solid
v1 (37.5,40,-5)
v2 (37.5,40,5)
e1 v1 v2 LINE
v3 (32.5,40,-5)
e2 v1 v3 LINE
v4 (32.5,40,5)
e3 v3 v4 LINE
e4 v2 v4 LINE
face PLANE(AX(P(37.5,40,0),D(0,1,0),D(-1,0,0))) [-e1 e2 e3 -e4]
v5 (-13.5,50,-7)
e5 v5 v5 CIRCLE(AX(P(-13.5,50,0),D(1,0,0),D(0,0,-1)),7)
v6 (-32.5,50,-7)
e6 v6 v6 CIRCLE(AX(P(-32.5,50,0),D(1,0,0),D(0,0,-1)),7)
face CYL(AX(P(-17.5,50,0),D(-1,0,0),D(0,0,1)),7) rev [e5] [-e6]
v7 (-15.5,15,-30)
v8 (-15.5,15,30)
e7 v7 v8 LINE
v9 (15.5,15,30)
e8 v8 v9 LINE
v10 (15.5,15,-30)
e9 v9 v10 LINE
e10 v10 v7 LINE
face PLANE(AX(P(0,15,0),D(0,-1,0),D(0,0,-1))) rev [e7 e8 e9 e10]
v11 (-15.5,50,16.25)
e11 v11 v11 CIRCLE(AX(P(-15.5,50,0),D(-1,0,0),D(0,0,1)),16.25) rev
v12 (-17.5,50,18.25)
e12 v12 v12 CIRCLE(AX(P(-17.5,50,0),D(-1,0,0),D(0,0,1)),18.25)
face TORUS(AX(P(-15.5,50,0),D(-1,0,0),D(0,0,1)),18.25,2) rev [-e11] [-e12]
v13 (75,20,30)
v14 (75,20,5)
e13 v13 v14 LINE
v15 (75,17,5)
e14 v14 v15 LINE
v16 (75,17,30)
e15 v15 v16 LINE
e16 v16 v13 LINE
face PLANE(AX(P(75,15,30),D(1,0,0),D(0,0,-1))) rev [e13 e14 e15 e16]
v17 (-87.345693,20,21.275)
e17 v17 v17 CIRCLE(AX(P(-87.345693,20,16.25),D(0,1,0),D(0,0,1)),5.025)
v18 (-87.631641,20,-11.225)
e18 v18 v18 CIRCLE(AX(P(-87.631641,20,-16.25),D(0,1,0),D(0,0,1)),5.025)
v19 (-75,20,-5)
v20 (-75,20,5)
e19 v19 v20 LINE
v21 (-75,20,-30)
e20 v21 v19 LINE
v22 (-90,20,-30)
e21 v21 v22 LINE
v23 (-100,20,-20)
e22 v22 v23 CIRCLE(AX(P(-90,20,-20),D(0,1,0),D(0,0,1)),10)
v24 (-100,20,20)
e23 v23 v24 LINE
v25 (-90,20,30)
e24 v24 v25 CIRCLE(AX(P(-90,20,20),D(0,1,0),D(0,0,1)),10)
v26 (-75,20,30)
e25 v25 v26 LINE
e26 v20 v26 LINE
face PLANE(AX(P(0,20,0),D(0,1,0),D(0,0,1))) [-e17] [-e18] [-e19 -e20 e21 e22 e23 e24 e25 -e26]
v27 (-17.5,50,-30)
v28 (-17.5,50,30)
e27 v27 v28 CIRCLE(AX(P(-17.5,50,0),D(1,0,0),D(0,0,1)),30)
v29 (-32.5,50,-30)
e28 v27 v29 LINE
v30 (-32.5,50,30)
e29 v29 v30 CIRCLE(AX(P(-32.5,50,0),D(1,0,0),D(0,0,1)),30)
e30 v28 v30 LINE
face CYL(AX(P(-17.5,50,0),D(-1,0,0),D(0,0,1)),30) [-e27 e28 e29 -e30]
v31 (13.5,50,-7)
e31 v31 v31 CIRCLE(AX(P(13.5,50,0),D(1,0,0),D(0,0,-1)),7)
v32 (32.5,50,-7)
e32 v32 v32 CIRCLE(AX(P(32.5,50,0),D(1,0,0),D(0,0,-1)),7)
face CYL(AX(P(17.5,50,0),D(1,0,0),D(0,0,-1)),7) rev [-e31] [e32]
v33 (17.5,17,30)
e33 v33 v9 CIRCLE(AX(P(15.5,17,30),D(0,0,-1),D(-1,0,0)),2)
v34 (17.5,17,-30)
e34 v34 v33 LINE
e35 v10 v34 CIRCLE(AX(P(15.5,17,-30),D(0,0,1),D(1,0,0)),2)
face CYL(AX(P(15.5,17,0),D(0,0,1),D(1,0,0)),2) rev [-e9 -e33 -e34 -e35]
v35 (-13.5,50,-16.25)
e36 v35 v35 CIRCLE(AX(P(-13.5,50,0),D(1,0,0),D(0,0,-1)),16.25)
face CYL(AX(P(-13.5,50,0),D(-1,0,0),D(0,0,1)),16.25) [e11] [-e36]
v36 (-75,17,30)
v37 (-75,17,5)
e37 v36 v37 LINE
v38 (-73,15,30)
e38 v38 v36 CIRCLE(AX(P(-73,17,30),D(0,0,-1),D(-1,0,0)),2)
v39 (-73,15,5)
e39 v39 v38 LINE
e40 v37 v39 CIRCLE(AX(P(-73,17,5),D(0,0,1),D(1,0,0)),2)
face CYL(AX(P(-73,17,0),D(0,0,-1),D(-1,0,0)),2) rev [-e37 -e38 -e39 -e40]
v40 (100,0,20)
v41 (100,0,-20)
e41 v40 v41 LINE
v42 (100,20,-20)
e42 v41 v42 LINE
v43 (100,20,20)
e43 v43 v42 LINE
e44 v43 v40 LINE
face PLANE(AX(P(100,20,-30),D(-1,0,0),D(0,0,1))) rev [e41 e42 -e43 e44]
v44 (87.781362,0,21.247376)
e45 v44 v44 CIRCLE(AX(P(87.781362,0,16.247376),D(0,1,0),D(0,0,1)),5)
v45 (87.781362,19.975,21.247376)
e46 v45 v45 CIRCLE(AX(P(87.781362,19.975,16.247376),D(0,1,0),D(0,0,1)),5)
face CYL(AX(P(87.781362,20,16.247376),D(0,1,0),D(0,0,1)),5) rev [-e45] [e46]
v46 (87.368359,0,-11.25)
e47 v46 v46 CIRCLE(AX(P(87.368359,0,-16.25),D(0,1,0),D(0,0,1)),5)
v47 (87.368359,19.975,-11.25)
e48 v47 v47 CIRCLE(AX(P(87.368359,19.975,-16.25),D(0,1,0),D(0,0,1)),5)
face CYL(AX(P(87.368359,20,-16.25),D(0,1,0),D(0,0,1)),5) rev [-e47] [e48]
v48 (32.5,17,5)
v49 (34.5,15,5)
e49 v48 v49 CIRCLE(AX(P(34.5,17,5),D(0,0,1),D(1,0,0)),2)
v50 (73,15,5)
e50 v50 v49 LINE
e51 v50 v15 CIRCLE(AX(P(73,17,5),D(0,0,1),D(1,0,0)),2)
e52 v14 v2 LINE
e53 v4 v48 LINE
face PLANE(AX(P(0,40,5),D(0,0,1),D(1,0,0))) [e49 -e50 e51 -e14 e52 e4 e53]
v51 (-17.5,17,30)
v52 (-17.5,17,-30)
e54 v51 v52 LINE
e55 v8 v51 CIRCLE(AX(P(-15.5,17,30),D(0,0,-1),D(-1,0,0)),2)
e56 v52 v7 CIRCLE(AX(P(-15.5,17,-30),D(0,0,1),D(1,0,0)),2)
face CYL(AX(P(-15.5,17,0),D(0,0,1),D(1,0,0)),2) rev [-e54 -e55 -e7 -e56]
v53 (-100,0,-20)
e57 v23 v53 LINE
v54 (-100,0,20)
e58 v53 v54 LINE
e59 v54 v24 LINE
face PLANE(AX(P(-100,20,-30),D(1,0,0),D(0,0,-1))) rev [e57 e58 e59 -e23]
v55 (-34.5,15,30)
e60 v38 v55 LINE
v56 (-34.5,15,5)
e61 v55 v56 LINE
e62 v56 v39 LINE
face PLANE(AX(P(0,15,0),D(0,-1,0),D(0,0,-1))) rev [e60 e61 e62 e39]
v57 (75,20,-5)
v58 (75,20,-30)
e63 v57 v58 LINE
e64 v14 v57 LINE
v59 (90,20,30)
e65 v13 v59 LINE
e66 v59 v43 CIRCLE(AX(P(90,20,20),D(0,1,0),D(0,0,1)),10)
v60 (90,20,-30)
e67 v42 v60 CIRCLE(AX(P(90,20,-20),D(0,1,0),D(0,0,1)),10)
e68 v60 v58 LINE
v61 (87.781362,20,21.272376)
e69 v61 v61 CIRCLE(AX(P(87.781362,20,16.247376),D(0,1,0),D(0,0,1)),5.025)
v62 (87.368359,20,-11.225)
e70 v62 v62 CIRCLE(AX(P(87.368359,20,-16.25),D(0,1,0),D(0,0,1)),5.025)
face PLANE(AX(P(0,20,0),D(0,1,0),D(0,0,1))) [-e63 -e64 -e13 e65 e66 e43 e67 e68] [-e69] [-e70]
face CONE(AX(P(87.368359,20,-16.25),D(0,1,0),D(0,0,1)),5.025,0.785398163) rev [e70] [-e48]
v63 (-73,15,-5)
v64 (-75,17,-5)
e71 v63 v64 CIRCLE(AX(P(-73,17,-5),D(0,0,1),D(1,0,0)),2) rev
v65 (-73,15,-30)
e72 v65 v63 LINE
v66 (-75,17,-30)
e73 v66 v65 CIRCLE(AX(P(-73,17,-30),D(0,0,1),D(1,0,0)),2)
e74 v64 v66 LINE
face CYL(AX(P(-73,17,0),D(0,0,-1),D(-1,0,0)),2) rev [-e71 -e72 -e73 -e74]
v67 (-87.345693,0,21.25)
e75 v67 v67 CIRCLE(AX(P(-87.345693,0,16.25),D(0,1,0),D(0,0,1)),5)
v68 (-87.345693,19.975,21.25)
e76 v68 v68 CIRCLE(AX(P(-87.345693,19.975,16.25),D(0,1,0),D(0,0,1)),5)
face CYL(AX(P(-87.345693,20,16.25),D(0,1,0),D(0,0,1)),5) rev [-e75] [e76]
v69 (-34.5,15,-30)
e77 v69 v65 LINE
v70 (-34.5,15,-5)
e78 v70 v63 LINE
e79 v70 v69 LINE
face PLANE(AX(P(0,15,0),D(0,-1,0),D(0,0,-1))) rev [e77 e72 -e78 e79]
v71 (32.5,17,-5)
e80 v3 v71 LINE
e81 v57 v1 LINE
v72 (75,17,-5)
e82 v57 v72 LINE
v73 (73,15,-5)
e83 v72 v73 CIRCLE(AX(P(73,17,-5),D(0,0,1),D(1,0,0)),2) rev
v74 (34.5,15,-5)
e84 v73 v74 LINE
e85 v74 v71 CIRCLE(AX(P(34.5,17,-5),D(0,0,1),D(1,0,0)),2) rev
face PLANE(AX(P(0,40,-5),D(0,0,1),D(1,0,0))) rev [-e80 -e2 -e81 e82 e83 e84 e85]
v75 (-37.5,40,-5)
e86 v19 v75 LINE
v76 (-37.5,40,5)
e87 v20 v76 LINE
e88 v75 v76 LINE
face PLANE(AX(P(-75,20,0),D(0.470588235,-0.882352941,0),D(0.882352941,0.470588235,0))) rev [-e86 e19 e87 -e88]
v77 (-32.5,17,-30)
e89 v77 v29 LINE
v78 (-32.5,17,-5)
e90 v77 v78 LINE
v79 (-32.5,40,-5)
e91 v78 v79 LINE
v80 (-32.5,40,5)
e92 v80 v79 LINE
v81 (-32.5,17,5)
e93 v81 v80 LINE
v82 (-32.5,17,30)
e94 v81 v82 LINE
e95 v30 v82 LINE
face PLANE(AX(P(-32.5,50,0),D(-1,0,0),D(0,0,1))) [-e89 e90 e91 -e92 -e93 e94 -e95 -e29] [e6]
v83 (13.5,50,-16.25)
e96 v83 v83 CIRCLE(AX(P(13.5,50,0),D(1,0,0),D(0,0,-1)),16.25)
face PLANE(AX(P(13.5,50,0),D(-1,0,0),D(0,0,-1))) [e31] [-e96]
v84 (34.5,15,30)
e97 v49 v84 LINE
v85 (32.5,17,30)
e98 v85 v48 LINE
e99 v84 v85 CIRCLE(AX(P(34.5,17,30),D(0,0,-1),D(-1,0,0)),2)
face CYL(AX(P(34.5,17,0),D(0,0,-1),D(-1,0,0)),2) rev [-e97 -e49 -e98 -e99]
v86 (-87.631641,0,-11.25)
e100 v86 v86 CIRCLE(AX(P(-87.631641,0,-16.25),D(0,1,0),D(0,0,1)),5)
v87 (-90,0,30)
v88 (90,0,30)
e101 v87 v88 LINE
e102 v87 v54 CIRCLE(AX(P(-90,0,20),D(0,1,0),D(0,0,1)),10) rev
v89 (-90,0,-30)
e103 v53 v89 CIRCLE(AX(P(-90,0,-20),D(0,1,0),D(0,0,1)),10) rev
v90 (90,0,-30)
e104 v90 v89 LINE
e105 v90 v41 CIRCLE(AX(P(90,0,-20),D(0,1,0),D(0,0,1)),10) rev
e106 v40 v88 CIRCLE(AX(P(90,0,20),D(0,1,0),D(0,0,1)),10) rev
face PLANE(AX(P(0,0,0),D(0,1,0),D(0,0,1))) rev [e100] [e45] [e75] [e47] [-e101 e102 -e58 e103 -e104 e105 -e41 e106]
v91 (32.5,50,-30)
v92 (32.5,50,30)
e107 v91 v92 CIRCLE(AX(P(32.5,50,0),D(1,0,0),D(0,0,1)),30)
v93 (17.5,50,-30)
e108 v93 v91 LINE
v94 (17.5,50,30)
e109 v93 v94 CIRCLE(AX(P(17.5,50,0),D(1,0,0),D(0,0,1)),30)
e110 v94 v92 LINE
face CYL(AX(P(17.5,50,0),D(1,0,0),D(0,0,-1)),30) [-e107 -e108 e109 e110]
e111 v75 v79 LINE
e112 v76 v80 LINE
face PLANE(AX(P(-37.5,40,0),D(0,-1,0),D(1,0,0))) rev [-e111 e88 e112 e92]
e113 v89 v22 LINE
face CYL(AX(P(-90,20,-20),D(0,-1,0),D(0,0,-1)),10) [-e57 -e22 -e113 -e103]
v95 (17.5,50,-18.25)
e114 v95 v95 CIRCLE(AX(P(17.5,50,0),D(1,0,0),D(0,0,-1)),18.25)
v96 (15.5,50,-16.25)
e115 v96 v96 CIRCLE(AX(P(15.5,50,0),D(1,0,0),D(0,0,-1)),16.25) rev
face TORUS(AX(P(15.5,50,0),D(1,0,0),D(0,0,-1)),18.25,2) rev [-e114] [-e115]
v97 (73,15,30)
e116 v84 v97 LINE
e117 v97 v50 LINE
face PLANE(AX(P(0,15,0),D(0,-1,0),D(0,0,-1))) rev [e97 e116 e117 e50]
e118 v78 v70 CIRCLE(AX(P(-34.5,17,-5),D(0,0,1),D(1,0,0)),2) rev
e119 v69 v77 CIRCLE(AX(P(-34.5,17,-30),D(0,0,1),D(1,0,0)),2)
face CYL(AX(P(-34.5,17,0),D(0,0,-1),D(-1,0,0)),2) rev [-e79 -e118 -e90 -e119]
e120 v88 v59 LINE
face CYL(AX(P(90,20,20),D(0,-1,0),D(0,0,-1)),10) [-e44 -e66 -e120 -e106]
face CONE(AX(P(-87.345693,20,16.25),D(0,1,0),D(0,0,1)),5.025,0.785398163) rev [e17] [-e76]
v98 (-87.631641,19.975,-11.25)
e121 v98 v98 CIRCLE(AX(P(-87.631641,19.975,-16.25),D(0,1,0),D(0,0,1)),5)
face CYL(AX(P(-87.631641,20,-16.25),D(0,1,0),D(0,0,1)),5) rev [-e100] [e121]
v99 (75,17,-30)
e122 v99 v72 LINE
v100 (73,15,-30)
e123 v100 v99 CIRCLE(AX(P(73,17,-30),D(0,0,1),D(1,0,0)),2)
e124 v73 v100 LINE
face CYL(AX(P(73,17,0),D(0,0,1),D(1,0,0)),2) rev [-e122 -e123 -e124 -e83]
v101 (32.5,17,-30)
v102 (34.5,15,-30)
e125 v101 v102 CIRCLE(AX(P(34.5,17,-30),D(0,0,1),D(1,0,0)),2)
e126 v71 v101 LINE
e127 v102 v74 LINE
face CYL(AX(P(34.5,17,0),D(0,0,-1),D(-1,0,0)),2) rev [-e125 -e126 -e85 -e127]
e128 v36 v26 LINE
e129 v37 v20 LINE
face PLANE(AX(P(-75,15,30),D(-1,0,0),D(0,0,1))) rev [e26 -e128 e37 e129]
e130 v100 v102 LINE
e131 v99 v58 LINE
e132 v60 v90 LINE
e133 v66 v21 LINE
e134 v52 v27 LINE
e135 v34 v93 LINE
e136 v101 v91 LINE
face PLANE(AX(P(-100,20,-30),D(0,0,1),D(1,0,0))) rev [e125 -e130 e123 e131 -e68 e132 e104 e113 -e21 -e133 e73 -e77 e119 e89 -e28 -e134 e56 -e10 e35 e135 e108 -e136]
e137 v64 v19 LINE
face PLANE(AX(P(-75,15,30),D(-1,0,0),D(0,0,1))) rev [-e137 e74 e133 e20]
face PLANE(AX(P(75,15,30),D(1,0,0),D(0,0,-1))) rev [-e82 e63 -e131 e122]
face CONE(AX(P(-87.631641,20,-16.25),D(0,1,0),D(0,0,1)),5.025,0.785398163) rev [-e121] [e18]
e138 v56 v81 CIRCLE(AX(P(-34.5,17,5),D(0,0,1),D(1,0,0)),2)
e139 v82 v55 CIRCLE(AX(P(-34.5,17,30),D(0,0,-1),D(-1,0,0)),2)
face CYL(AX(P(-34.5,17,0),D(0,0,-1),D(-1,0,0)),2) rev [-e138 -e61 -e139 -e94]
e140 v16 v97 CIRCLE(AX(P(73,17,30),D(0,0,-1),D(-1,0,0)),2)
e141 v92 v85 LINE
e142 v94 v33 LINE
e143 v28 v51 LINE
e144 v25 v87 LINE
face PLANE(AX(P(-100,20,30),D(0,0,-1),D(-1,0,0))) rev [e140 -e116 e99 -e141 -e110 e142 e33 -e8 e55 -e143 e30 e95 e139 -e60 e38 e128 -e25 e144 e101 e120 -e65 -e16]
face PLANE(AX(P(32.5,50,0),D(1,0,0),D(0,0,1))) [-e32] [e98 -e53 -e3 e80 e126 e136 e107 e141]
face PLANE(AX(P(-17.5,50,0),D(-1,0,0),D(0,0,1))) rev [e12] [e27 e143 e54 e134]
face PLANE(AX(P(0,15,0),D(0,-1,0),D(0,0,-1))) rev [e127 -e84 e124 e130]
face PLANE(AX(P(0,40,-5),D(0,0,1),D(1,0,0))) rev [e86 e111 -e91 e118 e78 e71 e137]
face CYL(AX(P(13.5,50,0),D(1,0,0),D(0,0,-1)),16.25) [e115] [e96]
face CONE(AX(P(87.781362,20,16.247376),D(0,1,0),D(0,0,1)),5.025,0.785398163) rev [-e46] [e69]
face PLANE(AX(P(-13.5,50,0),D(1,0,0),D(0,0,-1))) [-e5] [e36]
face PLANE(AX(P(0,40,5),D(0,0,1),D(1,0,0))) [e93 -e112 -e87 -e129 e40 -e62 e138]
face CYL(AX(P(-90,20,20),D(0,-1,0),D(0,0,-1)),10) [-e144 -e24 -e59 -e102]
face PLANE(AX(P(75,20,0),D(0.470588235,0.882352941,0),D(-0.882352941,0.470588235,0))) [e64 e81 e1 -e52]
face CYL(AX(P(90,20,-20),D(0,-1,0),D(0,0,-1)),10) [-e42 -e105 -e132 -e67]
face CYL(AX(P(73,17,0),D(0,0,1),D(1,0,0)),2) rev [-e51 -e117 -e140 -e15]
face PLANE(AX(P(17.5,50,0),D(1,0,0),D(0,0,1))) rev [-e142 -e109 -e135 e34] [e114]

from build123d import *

# Parameters (mm, degrees)
SKETCH1_W                        = 200
SKETCH1_H                        = 60
BOSS_EXTRUDE1_DEPTH              = 20
SKETCH2_W                        = 150
SKETCH2_H                        = 60
CUT_EXTRUDE1_DEPTH               = 5
SKETCH5_R                        = 7
BOSS_EXTRUDE2_DEPTH              = 15
RIB1_START                       = -5
RIB1_DEPTH                       = 10
SKETCH7_R                        = 16.25
SKETCH7_R_2                      = 7
BOSS_EXTRUDE3_DEPTH              = 4
FILLET1_R                        = 10
FILLET2_R                        = 2
F_10_0MM_DOWEL_HOLE2_D           = 10
F_10_0MM_DOWEL_HOLE2_CSINK_D     = 10.05
F_10_0MM_DOWEL_HOLE2_CSINK_ANGLE = 90


# Read off the part's stored shape, not the designer's step: Rib1
with BuildPart() as part:
    # Sketch1 → Boss-Extrude1 (new body)
    with BuildSketch(Plane(origin=(0, 0, 0), x_dir=(1, 0, 0), z_dir=(0, 1, 0))):
        Rectangle(SKETCH1_W, SKETCH1_H)
    extrude(amount=BOSS_EXTRUDE1_DEPTH)

    # Sketch2 → Cut-Extrude1 (cut)
    with BuildSketch(Plane(origin=(0, 20, 0), x_dir=(1, 0, 0), z_dir=(0, 1, 0))):
        Rectangle(SKETCH2_W, SKETCH2_H)
    extrude(amount=-CUT_EXTRUDE1_DEPTH, mode=Mode.SUBTRACT)

    # Sketch5 → Boss-Extrude2 (add)
    with BuildSketch(Plane(origin=(-32.5, 0, 0), x_dir=(0, 0, -1), z_dir=(1, 0, 0))):
        with BuildLine():
            Line((-30, 15), (-30, 50))
            ThreePointArc((-30, 50), (0, 80), (30, 50))
            Line((30, 50), (30, 15))
            Line((30, 15), (-30, 15))
        make_face()
        with Locations((0, 50)):
            Circle(SKETCH5_R, mode=Mode.SUBTRACT)
    boss_extrude2 = extrude(amount=BOSS_EXTRUDE2_DEPTH)

    # Rib1 outline → Rib1 (add)
    with BuildSketch(Plane.XY.offset(RIB1_START)):
        Polygon((-37.5, 40), (-75, 20), (-75, 15), (-32.5, 15), (-32.5, 40), align=None)
    rib1 = extrude(amount=RIB1_DEPTH)

    # Sketch7 → Boss-Extrude3 (add)
    with BuildSketch(Plane(origin=(-17.5, 0, 0), x_dir=(0, 0, -1), z_dir=(1, 0, 0))):
        with Locations(Location((0, 50, 0), (0, 0, 180))):
            Circle(SKETCH7_R)
        with Locations((0, 50)):
            Circle(SKETCH7_R_2, mode=Mode.SUBTRACT)
    boss_extrude3 = extrude(amount=BOSS_EXTRUDE3_DEPTH)

    # Mirror1: Boss-Extrude2, Rib1, Boss-Extrude3 across plane
    add(boss_extrude2.mirror(Plane(origin=(0, 0, 0), x_dir=(0, 0, 1), z_dir=(1, 0, 0))))
    add(rib1.mirror(Plane(origin=(0, 0, 0), x_dir=(0, 0, 1), z_dir=(1, 0, 0))))
    add(boss_extrude3.mirror(Plane(origin=(0, 0, 0), x_dir=(0, 0, 1), z_dir=(1, 0, 0))))

    # Fillet1
    fillet1_edges = [part.edges().sort_by_distance(p)[0] for p in [
        (100, 10, 30),
        (-100, 10, 30),
        (-100, 10, -30),
        (100, 10, -30),
    ]]
    fillet(fillet1_edges, radius=FILLET1_R)

    # Fillet2
    fillet2_edges = [part.edges().sort_by_distance(p)[0] for p in [
        (32.5, 15, -17.5),
        (75, 15, -17.5),
        (17.5, 50, -16.25),
        (75, 15, 17.5),
        (-75, 15, -17.5),
        (-17.5, 15, 0),
        (-32.5, 15, 17.5),
        (-32.5, 15, -17.5),
        (-75, 15, 17.5),
        (-17.5, 50, -16.25),
        (17.5, 15, 0),
        (32.5, 15, 17.5),
    ]]
    fillet(fillet2_edges, radius=FILLET2_R)

    # Ø10.0mm Dowel Hole2 (through all)
    with Locations(Plane(origin=(0, 20, 0), x_dir=(1, 0, 0), z_dir=(0, 1, 0))):
        with Locations((-87.631640785, 16.25), (-87.345692882, -16.25), (87.368359215, 16.25), (87.781361724, -16.247375724)):
            CounterSinkHole(F_10_0MM_DOWEL_HOLE2_D / 2, F_10_0MM_DOWEL_HOLE2_CSINK_D / 2, counter_sink_angle=F_10_0MM_DOWEL_HOLE2_CSINK_ANGLE)


solid = part.part
